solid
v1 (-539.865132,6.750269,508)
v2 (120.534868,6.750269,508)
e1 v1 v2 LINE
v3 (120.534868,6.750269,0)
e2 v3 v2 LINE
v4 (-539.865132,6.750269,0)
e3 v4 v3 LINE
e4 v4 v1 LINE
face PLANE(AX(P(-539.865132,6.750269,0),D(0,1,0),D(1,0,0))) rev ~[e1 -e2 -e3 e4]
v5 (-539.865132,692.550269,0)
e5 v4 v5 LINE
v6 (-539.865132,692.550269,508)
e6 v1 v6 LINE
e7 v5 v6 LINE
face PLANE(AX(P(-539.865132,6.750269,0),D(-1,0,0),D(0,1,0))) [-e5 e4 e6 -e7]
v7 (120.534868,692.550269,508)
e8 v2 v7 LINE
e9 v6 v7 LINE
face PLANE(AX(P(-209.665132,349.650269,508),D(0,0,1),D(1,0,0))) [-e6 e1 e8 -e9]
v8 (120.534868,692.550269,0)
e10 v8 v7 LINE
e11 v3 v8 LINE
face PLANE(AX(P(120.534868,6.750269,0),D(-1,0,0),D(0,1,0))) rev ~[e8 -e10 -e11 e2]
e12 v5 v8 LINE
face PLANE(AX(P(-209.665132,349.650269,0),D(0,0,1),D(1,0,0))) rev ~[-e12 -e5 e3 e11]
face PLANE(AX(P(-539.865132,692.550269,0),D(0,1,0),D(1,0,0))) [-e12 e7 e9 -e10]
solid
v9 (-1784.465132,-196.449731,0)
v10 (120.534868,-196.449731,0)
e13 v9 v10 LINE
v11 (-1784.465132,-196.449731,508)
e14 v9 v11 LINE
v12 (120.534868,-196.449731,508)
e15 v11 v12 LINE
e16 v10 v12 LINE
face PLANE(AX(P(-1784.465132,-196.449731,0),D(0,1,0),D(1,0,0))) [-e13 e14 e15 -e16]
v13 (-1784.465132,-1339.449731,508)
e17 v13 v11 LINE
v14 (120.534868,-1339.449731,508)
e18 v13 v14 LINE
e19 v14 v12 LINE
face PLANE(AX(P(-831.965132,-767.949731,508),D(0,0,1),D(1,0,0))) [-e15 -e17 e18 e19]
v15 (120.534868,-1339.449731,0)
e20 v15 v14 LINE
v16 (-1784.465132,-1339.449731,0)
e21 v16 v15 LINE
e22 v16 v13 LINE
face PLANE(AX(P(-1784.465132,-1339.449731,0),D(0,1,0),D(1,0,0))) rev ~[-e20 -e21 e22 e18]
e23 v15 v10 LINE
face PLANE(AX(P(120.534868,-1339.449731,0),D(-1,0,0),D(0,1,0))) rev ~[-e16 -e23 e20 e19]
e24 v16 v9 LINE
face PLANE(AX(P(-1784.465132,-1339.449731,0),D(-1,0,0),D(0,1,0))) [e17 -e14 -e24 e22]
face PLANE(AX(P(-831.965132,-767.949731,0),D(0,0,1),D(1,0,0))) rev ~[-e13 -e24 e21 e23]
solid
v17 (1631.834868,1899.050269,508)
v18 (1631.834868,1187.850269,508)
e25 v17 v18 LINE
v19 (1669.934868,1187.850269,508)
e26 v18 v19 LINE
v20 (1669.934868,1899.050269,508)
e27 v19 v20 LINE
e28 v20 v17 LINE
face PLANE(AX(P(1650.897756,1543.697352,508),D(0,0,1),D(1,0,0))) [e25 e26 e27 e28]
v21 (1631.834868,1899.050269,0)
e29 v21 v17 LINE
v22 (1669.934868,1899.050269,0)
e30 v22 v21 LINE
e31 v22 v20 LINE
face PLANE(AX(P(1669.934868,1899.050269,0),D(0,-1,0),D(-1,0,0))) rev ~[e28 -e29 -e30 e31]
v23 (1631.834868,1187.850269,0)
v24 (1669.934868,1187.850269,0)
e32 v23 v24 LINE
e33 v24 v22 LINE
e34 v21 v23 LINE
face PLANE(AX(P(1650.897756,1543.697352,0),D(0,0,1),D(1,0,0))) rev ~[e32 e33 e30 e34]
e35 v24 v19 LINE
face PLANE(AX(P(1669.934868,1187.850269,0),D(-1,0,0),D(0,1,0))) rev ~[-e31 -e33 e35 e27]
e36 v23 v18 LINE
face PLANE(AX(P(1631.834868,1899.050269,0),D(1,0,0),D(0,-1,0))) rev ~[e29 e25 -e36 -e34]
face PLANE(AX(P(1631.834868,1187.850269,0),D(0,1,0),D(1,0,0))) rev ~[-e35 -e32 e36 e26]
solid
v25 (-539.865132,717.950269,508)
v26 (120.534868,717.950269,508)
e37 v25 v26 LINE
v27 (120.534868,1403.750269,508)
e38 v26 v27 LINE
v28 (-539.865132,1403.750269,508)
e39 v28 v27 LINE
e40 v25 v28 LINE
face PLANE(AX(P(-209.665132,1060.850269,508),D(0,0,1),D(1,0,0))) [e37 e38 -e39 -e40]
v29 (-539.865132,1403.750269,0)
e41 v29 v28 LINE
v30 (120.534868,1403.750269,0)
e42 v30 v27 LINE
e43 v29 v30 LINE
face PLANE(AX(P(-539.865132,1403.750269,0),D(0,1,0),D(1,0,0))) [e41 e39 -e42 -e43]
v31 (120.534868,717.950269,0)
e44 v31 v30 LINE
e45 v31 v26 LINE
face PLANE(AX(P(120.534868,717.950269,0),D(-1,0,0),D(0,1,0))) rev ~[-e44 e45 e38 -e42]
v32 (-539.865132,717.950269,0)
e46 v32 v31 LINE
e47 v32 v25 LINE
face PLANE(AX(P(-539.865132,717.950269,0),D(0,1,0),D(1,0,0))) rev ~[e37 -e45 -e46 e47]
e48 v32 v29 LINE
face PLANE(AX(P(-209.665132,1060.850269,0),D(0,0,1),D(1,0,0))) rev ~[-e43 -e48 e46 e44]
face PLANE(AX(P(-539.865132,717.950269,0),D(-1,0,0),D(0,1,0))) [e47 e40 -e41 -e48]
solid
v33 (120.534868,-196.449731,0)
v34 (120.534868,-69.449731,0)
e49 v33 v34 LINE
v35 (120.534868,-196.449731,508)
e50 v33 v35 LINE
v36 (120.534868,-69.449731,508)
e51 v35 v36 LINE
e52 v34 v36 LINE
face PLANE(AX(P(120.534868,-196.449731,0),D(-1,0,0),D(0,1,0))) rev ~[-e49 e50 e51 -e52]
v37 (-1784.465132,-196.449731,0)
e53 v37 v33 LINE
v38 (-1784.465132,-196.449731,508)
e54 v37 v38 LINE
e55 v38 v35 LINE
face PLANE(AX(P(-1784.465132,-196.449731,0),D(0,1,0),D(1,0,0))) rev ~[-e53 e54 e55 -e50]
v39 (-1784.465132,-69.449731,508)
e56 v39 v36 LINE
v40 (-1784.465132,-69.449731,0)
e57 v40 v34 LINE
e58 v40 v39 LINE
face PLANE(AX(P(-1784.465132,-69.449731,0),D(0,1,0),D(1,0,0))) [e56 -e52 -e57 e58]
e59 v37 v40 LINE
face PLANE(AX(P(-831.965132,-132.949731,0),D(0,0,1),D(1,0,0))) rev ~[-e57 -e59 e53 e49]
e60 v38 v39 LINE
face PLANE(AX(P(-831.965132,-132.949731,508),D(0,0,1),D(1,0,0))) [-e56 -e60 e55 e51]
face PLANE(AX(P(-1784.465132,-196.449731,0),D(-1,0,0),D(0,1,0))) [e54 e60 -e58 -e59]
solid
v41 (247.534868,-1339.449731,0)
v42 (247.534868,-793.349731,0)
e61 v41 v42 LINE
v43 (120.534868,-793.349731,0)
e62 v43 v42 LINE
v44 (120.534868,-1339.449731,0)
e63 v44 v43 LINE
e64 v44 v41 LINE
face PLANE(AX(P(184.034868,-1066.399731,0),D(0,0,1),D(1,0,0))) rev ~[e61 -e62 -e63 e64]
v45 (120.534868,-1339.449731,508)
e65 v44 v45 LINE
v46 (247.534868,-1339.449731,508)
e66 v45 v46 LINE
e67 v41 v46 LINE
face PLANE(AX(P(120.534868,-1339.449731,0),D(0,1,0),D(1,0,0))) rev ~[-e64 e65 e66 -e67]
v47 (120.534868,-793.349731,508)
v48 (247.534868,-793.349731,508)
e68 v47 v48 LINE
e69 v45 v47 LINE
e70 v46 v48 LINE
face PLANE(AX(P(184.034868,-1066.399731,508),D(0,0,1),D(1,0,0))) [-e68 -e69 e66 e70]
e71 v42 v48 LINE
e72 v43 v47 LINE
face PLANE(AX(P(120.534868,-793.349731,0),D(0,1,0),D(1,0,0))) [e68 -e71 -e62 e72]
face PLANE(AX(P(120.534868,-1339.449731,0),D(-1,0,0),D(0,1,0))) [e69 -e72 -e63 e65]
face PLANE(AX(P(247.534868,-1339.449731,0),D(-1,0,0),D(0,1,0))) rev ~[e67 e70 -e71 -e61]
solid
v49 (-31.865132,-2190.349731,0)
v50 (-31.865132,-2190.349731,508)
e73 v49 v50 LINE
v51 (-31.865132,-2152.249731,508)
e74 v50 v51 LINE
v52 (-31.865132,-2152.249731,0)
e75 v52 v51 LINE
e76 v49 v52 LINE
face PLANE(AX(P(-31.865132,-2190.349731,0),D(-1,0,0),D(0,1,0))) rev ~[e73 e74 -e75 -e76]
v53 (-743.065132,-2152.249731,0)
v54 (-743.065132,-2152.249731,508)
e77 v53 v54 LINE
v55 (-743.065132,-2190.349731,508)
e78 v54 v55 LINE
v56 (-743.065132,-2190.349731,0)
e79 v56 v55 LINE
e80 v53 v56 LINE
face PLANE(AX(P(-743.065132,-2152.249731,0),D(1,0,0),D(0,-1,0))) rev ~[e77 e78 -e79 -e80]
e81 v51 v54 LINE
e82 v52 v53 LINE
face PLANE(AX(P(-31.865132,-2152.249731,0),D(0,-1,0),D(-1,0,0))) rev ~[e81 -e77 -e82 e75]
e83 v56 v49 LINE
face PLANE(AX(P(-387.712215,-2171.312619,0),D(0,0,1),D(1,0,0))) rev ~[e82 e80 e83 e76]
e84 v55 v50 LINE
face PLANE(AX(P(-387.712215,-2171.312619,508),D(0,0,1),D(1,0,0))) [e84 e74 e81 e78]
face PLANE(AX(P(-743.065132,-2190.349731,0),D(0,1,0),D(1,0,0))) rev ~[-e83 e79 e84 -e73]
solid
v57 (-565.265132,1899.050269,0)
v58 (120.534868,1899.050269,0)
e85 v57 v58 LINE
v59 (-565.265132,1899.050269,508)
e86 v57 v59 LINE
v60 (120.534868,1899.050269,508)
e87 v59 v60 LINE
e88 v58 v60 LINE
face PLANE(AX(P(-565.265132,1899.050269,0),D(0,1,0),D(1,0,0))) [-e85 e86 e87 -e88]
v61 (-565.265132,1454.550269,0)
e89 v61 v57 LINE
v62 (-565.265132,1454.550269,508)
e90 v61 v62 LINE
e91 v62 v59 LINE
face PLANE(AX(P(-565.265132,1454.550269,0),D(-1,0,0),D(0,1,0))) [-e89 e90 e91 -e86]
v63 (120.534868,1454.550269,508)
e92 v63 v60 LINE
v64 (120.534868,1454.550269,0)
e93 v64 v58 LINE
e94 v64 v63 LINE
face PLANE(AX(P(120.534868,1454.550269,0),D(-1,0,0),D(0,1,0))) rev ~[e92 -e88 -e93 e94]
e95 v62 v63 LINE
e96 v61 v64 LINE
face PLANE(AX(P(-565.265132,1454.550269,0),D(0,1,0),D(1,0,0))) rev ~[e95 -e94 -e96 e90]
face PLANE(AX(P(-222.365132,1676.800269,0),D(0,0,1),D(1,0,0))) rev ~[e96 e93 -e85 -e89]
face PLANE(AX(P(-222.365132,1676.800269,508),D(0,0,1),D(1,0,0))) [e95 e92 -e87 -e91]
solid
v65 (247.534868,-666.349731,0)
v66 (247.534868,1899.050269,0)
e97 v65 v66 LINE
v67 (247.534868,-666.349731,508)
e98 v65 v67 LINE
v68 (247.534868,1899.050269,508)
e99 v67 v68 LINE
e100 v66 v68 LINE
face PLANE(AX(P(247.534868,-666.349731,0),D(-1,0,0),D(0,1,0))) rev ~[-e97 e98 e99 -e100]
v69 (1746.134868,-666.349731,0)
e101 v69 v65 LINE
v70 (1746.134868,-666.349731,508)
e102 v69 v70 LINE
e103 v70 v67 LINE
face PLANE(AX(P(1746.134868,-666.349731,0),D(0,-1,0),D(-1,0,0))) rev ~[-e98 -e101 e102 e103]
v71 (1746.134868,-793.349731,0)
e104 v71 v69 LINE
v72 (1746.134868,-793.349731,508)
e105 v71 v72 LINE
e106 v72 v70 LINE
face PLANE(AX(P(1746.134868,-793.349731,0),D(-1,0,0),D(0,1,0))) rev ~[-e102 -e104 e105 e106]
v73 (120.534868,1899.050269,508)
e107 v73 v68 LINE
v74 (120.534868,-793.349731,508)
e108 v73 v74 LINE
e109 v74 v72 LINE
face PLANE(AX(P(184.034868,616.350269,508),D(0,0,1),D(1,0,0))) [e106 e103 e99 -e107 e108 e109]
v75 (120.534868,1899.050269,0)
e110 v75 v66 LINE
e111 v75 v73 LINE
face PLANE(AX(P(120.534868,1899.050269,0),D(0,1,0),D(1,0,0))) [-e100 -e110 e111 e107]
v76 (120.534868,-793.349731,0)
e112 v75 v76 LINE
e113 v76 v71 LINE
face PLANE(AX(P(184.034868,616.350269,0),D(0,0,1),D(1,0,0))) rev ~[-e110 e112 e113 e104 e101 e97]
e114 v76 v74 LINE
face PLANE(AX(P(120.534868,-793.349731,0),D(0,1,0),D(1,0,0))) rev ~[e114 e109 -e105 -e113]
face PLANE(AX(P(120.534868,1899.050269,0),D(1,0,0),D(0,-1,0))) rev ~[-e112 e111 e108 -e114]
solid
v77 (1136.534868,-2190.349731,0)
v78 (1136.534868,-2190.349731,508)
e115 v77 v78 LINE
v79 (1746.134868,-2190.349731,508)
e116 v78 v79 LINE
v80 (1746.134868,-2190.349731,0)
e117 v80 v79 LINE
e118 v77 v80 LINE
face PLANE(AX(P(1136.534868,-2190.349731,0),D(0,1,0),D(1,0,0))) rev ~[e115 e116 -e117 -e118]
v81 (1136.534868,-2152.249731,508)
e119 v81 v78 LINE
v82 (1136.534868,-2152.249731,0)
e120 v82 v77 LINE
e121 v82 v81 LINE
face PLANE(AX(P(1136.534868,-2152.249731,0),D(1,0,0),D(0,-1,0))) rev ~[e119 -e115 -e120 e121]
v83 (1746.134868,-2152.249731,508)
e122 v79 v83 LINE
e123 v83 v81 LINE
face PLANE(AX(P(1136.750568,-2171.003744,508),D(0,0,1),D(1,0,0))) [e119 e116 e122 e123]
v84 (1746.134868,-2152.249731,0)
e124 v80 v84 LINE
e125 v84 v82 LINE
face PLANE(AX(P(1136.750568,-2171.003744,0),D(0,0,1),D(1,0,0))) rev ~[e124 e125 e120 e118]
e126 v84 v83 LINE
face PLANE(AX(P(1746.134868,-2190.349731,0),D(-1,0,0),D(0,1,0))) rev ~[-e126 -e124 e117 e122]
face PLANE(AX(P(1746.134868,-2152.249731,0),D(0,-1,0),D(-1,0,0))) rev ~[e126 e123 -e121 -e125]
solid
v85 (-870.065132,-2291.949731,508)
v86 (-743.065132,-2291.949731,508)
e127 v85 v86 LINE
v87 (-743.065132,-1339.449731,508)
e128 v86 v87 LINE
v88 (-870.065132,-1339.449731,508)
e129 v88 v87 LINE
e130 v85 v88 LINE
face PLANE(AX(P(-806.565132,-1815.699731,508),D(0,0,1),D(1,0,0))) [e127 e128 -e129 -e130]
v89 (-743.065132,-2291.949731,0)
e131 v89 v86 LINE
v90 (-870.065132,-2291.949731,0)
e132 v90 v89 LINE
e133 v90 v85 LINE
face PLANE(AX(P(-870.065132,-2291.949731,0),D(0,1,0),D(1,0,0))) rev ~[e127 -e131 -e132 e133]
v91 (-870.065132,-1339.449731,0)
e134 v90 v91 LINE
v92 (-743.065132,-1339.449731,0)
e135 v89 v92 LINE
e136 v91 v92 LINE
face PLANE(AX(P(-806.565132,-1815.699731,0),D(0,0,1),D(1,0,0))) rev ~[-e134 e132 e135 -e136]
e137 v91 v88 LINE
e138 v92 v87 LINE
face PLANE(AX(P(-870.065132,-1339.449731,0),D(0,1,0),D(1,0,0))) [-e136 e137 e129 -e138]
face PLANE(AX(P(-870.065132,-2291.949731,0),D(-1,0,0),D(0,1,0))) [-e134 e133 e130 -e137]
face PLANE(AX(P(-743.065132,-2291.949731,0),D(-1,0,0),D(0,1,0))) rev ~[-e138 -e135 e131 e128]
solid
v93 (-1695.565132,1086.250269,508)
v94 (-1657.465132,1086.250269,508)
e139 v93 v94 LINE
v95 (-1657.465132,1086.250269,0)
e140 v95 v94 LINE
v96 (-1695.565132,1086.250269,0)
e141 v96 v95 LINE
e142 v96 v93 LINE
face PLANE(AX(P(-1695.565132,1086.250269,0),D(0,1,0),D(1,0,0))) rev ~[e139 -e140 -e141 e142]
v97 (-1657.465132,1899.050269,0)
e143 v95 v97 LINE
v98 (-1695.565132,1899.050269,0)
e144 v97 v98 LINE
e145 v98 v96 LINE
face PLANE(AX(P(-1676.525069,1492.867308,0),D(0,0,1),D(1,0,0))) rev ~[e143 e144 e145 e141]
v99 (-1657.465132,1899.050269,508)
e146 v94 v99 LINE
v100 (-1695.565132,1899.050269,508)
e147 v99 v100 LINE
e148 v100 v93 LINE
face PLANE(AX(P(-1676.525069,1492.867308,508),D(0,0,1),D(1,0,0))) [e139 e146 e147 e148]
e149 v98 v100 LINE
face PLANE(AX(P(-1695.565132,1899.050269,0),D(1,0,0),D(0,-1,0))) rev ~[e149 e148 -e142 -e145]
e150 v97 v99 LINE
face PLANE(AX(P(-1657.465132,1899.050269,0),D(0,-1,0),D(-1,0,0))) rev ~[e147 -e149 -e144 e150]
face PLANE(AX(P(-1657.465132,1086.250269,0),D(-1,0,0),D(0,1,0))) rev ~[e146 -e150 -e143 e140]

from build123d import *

# Parameters (mm, degrees)
F9_W      = 1905
F9_H      = 1143
F12_DEPTH = 508
F8_W      = 1905
F8_H      = 127
F7_W      = 127
F7_H      = 952.5
F4_W      = 660.4
F4_H      = 685.8
F1_W      = 685.8
F1_H      = 444.5
F10_W     = 127
F10_H     = 546.1
F2_W      = 127
F2_H      = 2565.4
F13_DEPTH = 508


# Not quite as in the source:
# - the program builds the solid bodies; features that only make, move or delete a surface that nothing else refers to are left out


with BuildPart() as f12:
    # F9 (on face) → F12 (new body)
    with BuildSketch(Plane.XY):
        with Locations((-831.9651317239, -767.9497311732)):
            Rectangle(F9_W, F9_H)
    extrude(amount=F12_DEPTH)


with BuildPart() as f12b:
    # F8 (on Top) → F12, piece 2 (new body)
    with BuildSketch(Plane.XY):
        with Locations((-831.9651317239, -132.9497311732)):
            Rectangle(F8_W, F8_H)
    extrude(amount=F12_DEPTH)


with BuildPart() as f12c:
    # F7 (on Top) → F12, piece 3 (new body)
    with BuildSketch(Plane.XY):
        with Locations((-806.5651317239, -1815.6997311732)):
            Rectangle(F7_W, F7_H)
    extrude(amount=F12_DEPTH)


with BuildPart() as f12d:
    # F6 (on Top) → F12, piece 4 (new body)
    with BuildSketch(Plane.XY):
        with BuildLine():
            Line((-1657.4651317239, 1899.0502688268), (-1695.5651317239, 1899.0502688268))
            Line((-1695.5651317239, 1899.0502688268), (-1695.5651317239, 1086.2502688268))
            ThreePointArc((-1695.5651317239, 1086.2502688268), (-1676.5098944488, 1086.4736644797), (-1657.4651317239, 1087.1437286389))
            Line((-1657.4651317239, 1087.1437286389), (-1657.4651317239, 1899.0502688268))
        make_face()
        with BuildLine():
            ThreePointArc((-1657.4651317239, 1087.1437286389), (-1676.5098944488, 1086.4736644797), (-1695.5651317239, 1086.2502688268))
            Line((-1695.5651317239, 1086.2502688268), (-1657.4651317239, 1086.2502688268))
            Line((-1657.4651317239, 1086.2502688268), (-1657.4651317239, 1087.1437286389))
        make_face()
    extrude(amount=F12_DEPTH)


with BuildPart() as f12e:
    # F5 (on Top) → F12, piece 5 (new body)
    with BuildSketch(Plane.XY):
        with BuildLine():
            Line((1669.9348682761, 1187.8502688268), (1669.9348682761, 1899.0502688268))
            Line((1669.9348682761, 1899.0502688268), (1631.8348682761, 1899.0502688268))
            Line((1631.8348682761, 1899.0502688268), (1631.8348682761, 1188.871537802))
            ThreePointArc((1631.8348682761, 1188.871537802), (1650.8780257365, 1188.1056319159), (1669.9348682761, 1187.8502688268))
        make_face()
        with BuildLine():
            Line((1631.8348682761, 1187.8502688268), (1669.9348682761, 1187.8502688268))
            ThreePointArc((1669.9348682761, 1187.8502688268), (1650.8780257365, 1188.1056319159), (1631.8348682761, 1188.871537802))
            Line((1631.8348682761, 1188.871537802), (1631.8348682761, 1187.8502688268))
        make_face()
    extrude(amount=F12_DEPTH)


with BuildPart() as f12f:
    # F4 (on Top) → F12, piece 6 (new body)
    with BuildSketch(Plane.XY):
        with Locations((-209.6651317239, 349.6502688268)):
            Rectangle(F4_W, F4_H)
    extrude(amount=F12_DEPTH)


with BuildPart() as f12g:
    # F4 (on Top) → F12, piece 7 (new body)
    with BuildSketch(Plane.XY):
        with Locations((-209.6651317239, 1060.8502688268)):
            Rectangle(F4_W, F4_H)
    extrude(amount=F12_DEPTH)


with BuildPart() as f12h:
    # F3 (on Top) → F12, piece 8 (new body)
    with BuildSketch(Plane.XY):
        with BuildLine():
            Line((1137.7266582723, -2152.2497311732), (1136.5348682761, -2152.2497311732))
            Line((1136.5348682761, -2152.2497311732), (1136.5348682761, -2190.3497311732))
            ThreePointArc((1136.5348682761, -2190.3497311732), (1136.832888623, -2171.2904134821), (1137.7266582723, -2152.2497311732))
        make_face()
        with BuildLine():
            Line((1746.1348682761, -2152.2497311732), (1137.7266582723, -2152.2497311732))
            ThreePointArc((1137.7266582723, -2152.2497311732), (1136.832888623, -2171.2904134821), (1136.5348682761, -2190.3497311732))
            Line((1136.5348682761, -2190.3497311732), (1746.1348682761, -2190.3497311732))
            Line((1746.1348682761, -2190.3497311732), (1746.1348682761, -2152.2497311732))
        make_face()
    extrude(amount=F12_DEPTH)


with BuildPart() as f12i:
    # F1 (on Top) → F12, piece 9 (new body)
    with BuildSketch(Plane.XY):
        with Locations((-222.3651317239, 1676.8002688268)):
            Rectangle(F1_W, F1_H)
    extrude(amount=F12_DEPTH)


with BuildPart() as f12j:
    # F10 (on face) → F12, piece 10 (new body)
    with BuildSketch(Plane.XY):
        with Locations((184.0348682761, -1066.3997311732)):
            Rectangle(F10_W, F10_H)
    extrude(amount=F12_DEPTH)


with BuildPart() as f12k:
    # F11 (on face) → F12, piece 11 (new body)
    with BuildSketch(Plane.XY):
        with BuildLine():
            Line((-743.0651317239, -2152.2497311732), (-743.0651317239, -2190.3497311732))
            Line((-743.0651317239, -2190.3497311732), (-31.8651317239, -2190.3497311732))
            ThreePointArc((-31.8651317239, -2190.3497311732), (-32.1204948129, -2171.2928886335), (-32.8864006991, -2152.2497311732))
            Line((-32.8864006991, -2152.2497311732), (-743.0651317239, -2152.2497311732))
        make_face()
        with BuildLine():
            ThreePointArc((-32.8864006991, -2152.2497311732), (-32.1204948129, -2171.2928886335), (-31.8651317239, -2190.3497311732))
            Line((-31.8651317239, -2190.3497311732), (-31.8651317239, -2152.2497311732))
            Line((-31.8651317239, -2152.2497311732), (-32.8864006991, -2152.2497311732))
        make_face()
    extrude(amount=F12_DEPTH)


with BuildPart() as f13:
    # F2 (on Top) → F13 (new body)
    with BuildSketch(Plane.XY):
        with Locations((184.0348682761, 616.3502688268)):
            Rectangle(F2_W, F2_H)
        Polygon((247.5348682761, -793.3497311732), (1746.1348682761, -793.3497311732), (1746.1348682761, -666.3497311732), (247.5348682761, -666.3497311732), (120.5348682761, -666.3497311732), (120.5348682761, -793.3497311732), align=None)
    extrude(amount=F13_DEPTH)


solid = Compound([f12.part, f12b.part, f12c.part, f12d.part, f12e.part, f12f.part, f12g.part, f12h.part, f12i.part, f12j.part, f12k.part, f13.part])
